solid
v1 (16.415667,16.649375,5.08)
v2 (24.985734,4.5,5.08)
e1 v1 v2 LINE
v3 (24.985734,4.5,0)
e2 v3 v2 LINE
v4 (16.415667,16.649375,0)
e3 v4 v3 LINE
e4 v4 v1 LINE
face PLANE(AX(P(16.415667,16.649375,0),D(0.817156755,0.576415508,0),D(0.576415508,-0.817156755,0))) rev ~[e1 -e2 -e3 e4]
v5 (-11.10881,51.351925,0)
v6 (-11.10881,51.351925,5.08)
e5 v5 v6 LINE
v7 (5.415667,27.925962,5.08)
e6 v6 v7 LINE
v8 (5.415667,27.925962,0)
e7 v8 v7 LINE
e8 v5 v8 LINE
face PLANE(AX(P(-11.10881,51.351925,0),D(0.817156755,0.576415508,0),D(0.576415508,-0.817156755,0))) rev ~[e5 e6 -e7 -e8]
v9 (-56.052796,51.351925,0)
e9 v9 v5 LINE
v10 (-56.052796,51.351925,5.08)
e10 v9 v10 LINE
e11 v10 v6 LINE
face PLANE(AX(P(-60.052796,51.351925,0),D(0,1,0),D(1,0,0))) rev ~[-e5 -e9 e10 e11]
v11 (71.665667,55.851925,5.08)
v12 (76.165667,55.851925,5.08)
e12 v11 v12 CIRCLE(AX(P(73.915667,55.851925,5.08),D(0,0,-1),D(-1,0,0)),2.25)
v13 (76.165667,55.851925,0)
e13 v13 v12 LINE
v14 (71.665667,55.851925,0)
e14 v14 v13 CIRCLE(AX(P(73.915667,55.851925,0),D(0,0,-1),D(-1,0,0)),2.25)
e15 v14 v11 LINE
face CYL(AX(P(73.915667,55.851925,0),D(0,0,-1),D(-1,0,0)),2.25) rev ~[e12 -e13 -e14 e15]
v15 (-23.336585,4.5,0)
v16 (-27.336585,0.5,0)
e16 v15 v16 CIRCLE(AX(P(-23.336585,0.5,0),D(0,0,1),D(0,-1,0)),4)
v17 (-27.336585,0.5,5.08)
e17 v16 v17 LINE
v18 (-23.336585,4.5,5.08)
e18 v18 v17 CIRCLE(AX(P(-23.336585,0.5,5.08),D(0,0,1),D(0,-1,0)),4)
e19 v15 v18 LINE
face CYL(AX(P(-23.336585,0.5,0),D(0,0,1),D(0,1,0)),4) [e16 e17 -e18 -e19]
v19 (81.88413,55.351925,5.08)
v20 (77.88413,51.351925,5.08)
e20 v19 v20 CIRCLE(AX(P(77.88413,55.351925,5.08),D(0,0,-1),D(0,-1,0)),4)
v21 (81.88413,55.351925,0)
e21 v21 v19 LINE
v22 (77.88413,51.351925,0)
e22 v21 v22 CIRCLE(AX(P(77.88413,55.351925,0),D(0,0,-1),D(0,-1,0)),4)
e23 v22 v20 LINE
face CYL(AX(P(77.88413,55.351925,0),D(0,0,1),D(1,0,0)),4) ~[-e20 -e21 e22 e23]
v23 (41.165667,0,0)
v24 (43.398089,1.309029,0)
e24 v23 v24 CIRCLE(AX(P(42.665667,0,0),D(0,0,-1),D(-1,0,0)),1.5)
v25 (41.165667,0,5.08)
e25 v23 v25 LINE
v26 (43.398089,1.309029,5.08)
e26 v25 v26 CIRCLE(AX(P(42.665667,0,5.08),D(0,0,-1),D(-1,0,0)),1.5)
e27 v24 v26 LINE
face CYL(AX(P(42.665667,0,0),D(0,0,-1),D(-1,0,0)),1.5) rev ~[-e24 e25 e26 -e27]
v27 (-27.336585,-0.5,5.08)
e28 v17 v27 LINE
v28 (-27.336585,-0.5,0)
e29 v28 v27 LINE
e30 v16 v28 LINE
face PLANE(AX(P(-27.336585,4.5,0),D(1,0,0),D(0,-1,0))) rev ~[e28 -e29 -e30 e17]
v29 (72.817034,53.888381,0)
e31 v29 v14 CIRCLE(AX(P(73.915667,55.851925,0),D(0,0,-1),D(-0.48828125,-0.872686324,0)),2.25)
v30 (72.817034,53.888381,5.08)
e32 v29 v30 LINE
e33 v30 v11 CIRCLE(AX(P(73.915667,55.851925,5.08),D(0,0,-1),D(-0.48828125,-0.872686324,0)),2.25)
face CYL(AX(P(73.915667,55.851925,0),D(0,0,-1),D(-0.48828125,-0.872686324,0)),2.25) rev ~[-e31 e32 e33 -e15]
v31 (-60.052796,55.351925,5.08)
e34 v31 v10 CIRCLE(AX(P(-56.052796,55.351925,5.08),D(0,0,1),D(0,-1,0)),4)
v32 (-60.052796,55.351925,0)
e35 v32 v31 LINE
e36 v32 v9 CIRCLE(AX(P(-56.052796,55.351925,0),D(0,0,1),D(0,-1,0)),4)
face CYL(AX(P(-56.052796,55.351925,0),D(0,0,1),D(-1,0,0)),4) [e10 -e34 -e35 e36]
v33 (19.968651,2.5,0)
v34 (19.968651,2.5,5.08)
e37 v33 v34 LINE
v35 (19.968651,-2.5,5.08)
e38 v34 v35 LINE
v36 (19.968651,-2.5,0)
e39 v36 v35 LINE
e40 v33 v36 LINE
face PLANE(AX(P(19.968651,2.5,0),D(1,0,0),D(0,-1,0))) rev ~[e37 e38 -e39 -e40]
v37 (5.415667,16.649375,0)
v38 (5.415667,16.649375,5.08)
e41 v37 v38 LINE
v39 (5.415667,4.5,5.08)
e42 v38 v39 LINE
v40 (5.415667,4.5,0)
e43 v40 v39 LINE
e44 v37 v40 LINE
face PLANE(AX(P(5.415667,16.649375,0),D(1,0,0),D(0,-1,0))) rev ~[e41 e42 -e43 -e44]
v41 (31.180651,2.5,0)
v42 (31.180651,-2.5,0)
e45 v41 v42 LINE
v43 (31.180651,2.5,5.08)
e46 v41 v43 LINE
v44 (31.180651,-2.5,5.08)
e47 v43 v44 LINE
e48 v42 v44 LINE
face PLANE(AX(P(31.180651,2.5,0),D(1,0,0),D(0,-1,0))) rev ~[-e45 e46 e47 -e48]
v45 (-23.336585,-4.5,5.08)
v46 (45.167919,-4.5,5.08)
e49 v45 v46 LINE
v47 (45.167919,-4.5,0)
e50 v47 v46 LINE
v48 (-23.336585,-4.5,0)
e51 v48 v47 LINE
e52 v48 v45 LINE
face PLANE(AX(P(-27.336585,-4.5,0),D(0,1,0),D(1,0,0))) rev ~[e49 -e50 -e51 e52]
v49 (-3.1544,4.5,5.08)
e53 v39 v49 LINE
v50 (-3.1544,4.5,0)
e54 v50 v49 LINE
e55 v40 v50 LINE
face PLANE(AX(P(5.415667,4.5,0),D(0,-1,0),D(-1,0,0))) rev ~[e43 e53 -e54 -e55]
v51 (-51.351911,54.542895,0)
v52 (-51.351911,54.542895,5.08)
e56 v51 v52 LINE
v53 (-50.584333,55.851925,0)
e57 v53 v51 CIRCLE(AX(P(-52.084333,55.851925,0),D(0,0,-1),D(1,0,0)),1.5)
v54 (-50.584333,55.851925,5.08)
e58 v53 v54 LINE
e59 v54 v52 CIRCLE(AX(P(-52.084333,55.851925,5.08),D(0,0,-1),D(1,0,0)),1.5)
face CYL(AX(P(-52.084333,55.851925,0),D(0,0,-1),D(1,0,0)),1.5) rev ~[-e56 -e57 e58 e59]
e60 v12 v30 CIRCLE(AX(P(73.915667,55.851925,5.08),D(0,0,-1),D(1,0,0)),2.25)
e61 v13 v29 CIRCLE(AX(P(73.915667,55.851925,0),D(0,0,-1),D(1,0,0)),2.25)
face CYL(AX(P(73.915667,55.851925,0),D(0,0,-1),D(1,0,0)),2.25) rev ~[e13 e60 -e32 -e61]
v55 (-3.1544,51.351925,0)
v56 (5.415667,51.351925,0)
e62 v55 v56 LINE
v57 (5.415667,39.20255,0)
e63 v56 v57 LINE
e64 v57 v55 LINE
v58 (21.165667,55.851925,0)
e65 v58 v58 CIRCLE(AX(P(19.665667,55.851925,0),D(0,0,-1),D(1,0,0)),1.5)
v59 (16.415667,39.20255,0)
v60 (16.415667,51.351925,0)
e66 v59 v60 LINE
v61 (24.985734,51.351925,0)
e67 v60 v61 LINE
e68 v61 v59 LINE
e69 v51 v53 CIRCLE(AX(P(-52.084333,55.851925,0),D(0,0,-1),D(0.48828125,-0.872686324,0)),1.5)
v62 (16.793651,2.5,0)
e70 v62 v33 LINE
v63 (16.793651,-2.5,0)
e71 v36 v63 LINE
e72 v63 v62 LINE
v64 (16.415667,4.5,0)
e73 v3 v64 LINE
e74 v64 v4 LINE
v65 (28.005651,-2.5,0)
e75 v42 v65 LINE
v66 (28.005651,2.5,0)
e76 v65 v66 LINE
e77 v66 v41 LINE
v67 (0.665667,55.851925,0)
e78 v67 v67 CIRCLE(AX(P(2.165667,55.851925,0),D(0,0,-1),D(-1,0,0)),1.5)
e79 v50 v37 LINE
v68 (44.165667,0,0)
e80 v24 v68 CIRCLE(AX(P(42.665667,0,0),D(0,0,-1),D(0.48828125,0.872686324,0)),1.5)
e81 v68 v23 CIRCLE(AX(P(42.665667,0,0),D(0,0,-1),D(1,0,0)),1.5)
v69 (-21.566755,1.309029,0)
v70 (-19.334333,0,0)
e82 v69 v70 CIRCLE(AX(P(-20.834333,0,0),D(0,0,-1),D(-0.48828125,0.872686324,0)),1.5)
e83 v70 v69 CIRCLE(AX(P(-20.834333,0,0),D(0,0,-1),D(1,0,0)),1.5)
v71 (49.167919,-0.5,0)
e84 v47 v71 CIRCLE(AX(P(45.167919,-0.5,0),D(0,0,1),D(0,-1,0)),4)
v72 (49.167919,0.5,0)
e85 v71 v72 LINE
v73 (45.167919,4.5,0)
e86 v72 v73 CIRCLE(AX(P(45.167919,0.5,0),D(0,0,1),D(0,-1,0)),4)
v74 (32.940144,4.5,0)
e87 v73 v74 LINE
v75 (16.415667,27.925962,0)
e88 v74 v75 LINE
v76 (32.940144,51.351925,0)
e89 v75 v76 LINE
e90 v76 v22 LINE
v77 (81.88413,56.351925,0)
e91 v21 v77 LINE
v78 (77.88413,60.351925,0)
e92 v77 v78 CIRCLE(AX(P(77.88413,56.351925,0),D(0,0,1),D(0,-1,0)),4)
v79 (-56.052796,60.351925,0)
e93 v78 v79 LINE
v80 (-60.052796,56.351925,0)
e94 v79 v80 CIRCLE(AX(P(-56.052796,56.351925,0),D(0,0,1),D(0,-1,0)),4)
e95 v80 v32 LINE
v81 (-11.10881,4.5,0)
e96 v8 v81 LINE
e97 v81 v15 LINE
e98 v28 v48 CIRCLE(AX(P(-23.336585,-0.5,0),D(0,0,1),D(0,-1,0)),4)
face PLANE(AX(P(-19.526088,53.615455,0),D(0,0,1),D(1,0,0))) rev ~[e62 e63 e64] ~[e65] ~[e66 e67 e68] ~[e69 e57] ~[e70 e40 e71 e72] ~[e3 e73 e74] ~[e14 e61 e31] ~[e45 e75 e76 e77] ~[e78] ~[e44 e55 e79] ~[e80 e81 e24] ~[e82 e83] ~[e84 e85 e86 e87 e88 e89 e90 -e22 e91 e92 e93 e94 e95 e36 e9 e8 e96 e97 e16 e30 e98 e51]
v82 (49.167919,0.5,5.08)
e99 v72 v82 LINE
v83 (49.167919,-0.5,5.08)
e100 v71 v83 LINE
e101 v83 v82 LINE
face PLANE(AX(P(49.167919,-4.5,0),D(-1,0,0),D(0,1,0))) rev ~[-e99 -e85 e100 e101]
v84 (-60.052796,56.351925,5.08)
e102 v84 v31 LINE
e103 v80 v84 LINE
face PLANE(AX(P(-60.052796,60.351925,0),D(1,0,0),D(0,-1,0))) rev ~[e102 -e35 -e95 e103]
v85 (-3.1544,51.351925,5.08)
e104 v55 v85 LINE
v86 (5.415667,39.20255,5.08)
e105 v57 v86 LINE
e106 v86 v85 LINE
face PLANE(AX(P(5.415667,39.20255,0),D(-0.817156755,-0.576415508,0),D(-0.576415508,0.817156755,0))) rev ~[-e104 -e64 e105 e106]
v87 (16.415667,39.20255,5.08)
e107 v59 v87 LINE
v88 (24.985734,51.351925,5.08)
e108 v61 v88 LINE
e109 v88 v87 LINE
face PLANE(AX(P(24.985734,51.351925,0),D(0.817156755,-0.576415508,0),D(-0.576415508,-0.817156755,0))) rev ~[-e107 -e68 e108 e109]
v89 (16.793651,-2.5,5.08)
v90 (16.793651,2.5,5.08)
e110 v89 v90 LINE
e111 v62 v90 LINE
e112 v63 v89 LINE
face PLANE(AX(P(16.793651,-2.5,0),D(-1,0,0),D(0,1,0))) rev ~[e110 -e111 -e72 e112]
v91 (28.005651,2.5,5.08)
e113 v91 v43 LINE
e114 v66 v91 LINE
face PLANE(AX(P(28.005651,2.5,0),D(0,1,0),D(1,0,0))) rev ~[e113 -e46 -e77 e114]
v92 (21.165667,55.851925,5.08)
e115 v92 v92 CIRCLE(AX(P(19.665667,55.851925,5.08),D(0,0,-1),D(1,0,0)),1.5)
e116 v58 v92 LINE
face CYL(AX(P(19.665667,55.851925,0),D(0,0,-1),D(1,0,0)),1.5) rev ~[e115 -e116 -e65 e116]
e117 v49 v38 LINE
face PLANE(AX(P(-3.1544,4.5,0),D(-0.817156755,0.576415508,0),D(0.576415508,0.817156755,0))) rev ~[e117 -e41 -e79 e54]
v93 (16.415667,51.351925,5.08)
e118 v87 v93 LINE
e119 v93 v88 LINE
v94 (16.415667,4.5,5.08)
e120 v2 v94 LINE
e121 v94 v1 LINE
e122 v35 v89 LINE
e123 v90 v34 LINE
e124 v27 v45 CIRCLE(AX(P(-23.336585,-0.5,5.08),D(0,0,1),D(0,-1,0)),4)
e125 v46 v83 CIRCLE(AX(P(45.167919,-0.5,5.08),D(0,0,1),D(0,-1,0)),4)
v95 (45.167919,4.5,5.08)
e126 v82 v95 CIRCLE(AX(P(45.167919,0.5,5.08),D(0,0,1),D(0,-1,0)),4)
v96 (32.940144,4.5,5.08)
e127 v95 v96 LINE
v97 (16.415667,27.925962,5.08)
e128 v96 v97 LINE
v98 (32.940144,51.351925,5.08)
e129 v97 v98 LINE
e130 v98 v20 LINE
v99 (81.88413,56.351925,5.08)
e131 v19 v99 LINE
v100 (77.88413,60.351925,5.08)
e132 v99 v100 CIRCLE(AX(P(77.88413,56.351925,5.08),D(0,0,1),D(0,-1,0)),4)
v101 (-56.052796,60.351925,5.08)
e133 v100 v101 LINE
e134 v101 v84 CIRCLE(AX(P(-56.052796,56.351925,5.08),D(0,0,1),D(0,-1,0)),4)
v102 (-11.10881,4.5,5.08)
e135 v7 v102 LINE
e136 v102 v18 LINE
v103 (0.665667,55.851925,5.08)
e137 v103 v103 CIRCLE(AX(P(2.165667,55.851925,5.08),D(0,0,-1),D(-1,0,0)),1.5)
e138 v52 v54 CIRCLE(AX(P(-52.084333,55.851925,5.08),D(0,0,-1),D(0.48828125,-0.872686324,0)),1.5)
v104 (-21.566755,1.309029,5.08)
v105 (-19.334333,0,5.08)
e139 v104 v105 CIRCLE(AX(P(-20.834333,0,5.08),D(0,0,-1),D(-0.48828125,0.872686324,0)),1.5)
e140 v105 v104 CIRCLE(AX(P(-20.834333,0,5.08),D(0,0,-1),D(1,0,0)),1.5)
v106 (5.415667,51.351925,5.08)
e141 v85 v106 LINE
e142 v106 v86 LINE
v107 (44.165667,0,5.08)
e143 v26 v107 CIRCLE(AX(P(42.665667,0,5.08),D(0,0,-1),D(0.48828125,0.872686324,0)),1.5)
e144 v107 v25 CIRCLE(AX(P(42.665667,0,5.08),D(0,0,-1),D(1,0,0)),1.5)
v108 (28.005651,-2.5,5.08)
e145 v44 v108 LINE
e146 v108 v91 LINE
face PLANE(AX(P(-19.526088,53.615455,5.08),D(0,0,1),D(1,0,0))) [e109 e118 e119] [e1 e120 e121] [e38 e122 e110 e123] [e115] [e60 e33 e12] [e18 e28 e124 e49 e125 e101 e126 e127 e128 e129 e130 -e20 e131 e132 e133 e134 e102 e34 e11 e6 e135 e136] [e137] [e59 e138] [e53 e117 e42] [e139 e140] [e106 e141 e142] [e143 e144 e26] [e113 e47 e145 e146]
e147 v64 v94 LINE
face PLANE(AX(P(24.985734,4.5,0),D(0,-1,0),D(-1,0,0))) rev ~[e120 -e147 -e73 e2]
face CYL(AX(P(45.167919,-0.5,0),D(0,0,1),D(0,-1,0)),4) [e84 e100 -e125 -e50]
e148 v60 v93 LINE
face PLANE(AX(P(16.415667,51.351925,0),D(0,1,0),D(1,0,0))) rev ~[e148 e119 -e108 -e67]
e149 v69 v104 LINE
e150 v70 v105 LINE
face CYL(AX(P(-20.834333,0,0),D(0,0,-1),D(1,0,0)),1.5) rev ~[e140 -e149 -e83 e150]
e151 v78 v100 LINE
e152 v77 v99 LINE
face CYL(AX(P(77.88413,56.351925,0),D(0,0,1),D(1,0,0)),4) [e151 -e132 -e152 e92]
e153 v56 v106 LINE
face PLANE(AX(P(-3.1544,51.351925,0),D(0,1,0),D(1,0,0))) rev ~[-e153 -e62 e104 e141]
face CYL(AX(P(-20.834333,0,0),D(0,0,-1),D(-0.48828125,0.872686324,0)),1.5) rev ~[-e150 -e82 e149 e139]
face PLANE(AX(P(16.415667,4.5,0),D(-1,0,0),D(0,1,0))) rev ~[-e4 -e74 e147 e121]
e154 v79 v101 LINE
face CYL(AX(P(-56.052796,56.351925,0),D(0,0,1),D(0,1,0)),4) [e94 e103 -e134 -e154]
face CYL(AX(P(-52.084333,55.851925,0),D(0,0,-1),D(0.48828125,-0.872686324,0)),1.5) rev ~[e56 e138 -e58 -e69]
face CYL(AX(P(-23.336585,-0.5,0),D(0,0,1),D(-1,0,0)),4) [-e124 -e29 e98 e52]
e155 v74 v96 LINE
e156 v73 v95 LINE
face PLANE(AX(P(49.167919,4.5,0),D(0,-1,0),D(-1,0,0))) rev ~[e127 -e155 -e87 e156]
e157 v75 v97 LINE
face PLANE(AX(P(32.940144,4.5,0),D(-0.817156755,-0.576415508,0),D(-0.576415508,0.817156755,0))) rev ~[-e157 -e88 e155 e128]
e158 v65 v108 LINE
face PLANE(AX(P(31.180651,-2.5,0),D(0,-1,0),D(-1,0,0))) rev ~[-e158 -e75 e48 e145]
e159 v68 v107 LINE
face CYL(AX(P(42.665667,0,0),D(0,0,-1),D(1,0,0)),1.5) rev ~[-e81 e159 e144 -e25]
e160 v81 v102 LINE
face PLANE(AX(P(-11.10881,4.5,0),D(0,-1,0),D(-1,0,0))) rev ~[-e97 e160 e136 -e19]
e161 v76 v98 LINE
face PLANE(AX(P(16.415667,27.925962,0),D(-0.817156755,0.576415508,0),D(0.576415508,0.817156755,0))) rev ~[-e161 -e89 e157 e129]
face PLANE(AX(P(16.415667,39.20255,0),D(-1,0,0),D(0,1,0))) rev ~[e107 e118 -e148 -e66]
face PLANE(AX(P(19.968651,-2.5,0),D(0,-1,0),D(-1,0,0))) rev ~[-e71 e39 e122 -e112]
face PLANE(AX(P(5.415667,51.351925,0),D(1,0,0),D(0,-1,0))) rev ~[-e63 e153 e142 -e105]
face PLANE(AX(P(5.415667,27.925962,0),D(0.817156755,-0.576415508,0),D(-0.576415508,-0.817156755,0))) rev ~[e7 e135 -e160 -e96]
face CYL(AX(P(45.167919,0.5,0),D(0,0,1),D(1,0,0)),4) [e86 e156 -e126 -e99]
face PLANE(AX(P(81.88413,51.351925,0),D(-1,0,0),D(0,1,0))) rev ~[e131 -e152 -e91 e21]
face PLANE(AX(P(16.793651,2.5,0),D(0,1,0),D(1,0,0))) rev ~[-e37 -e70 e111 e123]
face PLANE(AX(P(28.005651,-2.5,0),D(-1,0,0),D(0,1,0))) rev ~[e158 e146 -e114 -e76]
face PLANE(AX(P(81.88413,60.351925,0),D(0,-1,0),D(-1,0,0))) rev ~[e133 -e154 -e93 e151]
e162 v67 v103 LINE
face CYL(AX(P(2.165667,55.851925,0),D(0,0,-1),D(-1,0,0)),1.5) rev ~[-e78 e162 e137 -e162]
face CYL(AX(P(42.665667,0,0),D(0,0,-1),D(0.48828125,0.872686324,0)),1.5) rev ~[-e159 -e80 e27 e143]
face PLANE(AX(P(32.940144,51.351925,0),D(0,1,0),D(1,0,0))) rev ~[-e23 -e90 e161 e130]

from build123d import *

# Parameters (mm, degrees)
F1_DEPTH = 5.08
F2_R     = 4


# Not quite as in the source:
# - a feature names something its author has since deleted; it is built from what else it names


with BuildPart() as f1:
    # F0 (on Top) → F1 (new body)
    with BuildSketch(Plane.XY):
        with BuildLine():
            Line((0.6656670719, 55.8519247654), (-50.5843329281, 55.8519247654))
            ThreePointArc((-50.5843329281, 55.8519247654), (-50.7903791398, 55.0931866065), (-51.3519110531, 54.5428952787))
            Line((-51.3519110531, 54.5428952787), (-49.566514597, 51.3519247654))
            Line((-49.566514597, 51.3519247654), (-11.1088099211, 51.3519247654))
            Line((-11.1088099211, 51.3519247654), (-3.1543997556, 51.3519247654))
            Line((-3.1543997556, 51.3519247654), (5.4156670719, 51.3519247654))
            Line((5.4156670719, 51.3519247654), (10.9156670719, 51.3519247654))
            Line((10.9156670719, 51.3519247654), (10.9156670719, 55.8519247654))
            Line((10.9156670719, 55.8519247654), (3.6656670719, 55.8519247654))
            ThreePointArc((3.6656670719, 55.8519247654), (2.1656670719, 54.3519247654), (0.6656670719, 55.8519247654))
        make_face()
        with BuildLine():
            Line((-11.1088099211, 4.5), (-23.3521512592, 4.5))
            Line((-23.3521512592, 4.5), (-21.5667548031, 1.3090294867))
            ThreePointArc((-21.5667548031, 1.3090294867), (-20.0755947692, 1.2939537883), (-19.3343329281, 0))
            Line((-19.3343329281, 0), (10.9156670719, 0))
            Line((10.9156670719, 0), (10.9156670719, 4.5))
            Line((10.9156670719, 4.5), (5.4156670719, 4.5))
            Line((5.4156670719, 4.5), (-3.1543997556, 4.5))
            Line((-3.1543997556, 4.5), (-11.1088099211, 4.5))
        make_face()
        with BuildLine():
            ThreePointArc((-51.3519110531, 54.5428952787), (-53.3782867164, 56.6106629243), (-50.5843329281, 55.8519247654))
            Line((-50.5843329281, 55.8519247654), (0.6656670719, 55.8519247654))
            ThreePointArc((0.6656670719, 55.8519247654), (2.1656670719, 57.3519247654), (3.6656670719, 55.8519247654))
            Line((3.6656670719, 55.8519247654), (10.9156670719, 55.8519247654))
            Line((10.9156670719, 55.8519247654), (18.1656670719, 55.8519247654))
            ThreePointArc((18.1656670719, 55.8519247654), (19.6656670719, 57.3519247654), (21.1656670719, 55.8519247654))
            Line((21.1656670719, 55.8519247654), (71.6656670719, 55.8519247654))
            ThreePointArc((71.6656670719, 55.8519247654), (73.9156670719, 58.1019247654), (76.1656670719, 55.8519247654))
            ThreePointArc((76.1656670719, 55.8519247654), (75.0537743102, 53.910994083), (72.8170342594, 53.8883805354))
            Line((72.8170342594, 53.8883805354), (71.3978487408, 51.3519247654))
            Line((71.3978487408, 51.3519247654), (81.8841302488, 51.3519247654))
            Line((81.8841302488, 51.3519247654), (81.8841302488, 60.3519247654))
            Line((81.8841302488, 60.3519247654), (-60.052796105, 60.3519247654))
            Line((-60.052796105, 60.3519247654), (-60.052796105, 51.3519247654))
            Line((-60.052796105, 51.3519247654), (-49.566514597, 51.3519247654))
            Line((-49.566514597, 51.3519247654), (-51.3519110531, 54.5428952787))
        make_face()
        with BuildLine():
            Line((-21.5667548031, 1.3090294867), (-23.3521512592, 4.5))
            Line((-23.3521512592, 4.5), (-27.3365851734, 4.5))
            Line((-27.3365851734, 4.5), (-27.3365851734, -4.5))
            Line((-27.3365851734, -4.5), (49.1679193172, -4.5))
            Line((49.1679193172, -4.5), (49.1679193172, 4.5))
            Line((49.1679193172, 4.5), (45.183485403, 4.5))
            Line((45.183485403, 4.5), (43.3980889469, 1.3090294867))
            ThreePointArc((43.3980889469, 1.3090294867), (43.9596208602, 0.7587381589), (44.1656670719, 0))
            ThreePointArc((44.1656670719, 0), (42.6656670719, -1.5), (41.1656670719, 0))
            Line((41.1656670719, 0), (31.1806510627, 0))
            Line((31.1806510627, 0), (31.1806510627, -2.5))
            Line((31.1806510627, -2.5), (28.0056510627, -2.5))
            Line((28.0056510627, -2.5), (28.0056510627, 0))
            Line((28.0056510627, 0), (19.9686510627, 0))
            Line((19.9686510627, 0), (19.9686510627, -2.5))
            Line((19.9686510627, -2.5), (16.7936510627, -2.5))
            Line((16.7936510627, -2.5), (16.7936510627, 0))
            Line((16.7936510627, 0), (10.9156670719, 0))
            Line((10.9156670719, 0), (-19.3343329281, 0))
            ThreePointArc((-19.3343329281, 0), (-21.593071087, -1.2939537883), (-21.5667548031, 1.3090294867))
        make_face()
        with BuildLine():
            Line((10.9156670719, 4.5), (10.9156670719, 0))
            Line((10.9156670719, 0), (16.7936510627, 0))
            Line((16.7936510627, 0), (16.7936510627, 2.5))
            Line((16.7936510627, 2.5), (19.9686510627, 2.5))
            Line((19.9686510627, 2.5), (19.9686510627, 0))
            Line((19.9686510627, 0), (28.0056510627, 0))
            Line((28.0056510627, 0), (28.0056510627, 2.5))
            Line((28.0056510627, 2.5), (31.1806510627, 2.5))
            Line((31.1806510627, 2.5), (31.1806510627, 0))
            Line((31.1806510627, 0), (41.1656670719, 0))
            ThreePointArc((41.1656670719, 0), (41.906928913, 1.2939537883), (43.3980889469, 1.3090294867))
            Line((43.3980889469, 1.3090294867), (45.183485403, 4.5))
            Line((45.183485403, 4.5), (32.9401440649, 4.5))
            Line((32.9401440649, 4.5), (24.9857338994, 4.5))
            Line((24.9857338994, 4.5), (16.4156670719, 4.5))
            Line((16.4156670719, 4.5), (10.9156670719, 4.5))
        make_face()
        with BuildLine():
            Line((18.1656670719, 55.8519247654), (10.9156670719, 55.8519247654))
            Line((10.9156670719, 55.8519247654), (10.9156670719, 51.3519247654))
            Line((10.9156670719, 51.3519247654), (16.4156670719, 51.3519247654))
            Line((16.4156670719, 51.3519247654), (24.9857338994, 51.3519247654))
            Line((24.9857338994, 51.3519247654), (32.9401440649, 51.3519247654))
            Line((32.9401440649, 51.3519247654), (71.3978487408, 51.3519247654))
            Line((71.3978487408, 51.3519247654), (72.8170342594, 53.8883805354))
            ThreePointArc((72.8170342594, 53.8883805354), (71.9747363894, 54.7138175271), (71.6656670719, 55.8519247654))
            Line((71.6656670719, 55.8519247654), (21.1656670719, 55.8519247654))
            ThreePointArc((21.1656670719, 55.8519247654), (19.6656670719, 54.3519247654), (18.1656670719, 55.8519247654))
        make_face()
        Polygon((5.4156670719, 39.2025500407), (5.4156670719, 27.9259623827), (10.9156670719, 27.9259623827), (10.9156670719, 51.3519247654), (5.4156670719, 51.3519247654), align=None)
        Polygon((10.9156670719, 27.9259623827), (5.4156670719, 27.9259623827), (5.4156670719, 16.6493747247), (5.4156670719, 4.5), (10.9156670719, 4.5), align=None)
        Polygon((16.4156670719, 51.3519247654), (10.9156670719, 51.3519247654), (10.9156670719, 27.9259623827), (16.4156670719, 27.9259623827), (16.4156670719, 39.2025500407), align=None)
        Polygon((16.4156670719, 27.9259623827), (10.9156670719, 27.9259623827), (10.9156670719, 4.5), (16.4156670719, 4.5), (16.4156670719, 16.6493747247), align=None)
        Polygon((-3.1543997556, 51.3519247654), (-11.1088099211, 51.3519247654), (5.4156670719, 27.9259623827), (5.4156670719, 39.2025500407), align=None)
        Polygon((5.4156670719, 27.9259623827), (-11.1088099211, 4.5), (-3.1543997556, 4.5), (5.4156670719, 16.6493747247), align=None)
        Polygon((32.9401440649, 4.5), (16.4156670719, 27.9259623827), (16.4156670719, 16.6493747247), (24.9857338994, 4.5), align=None)
        Polygon((16.4156670719, 39.2025500407), (16.4156670719, 27.9259623827), (32.9401440649, 51.3519247654), (24.9857338994, 51.3519247654), align=None)
    extrude(amount=F1_DEPTH)

    # F2
    f2_edges = [f1.edges().sort_by_distance(p)[0] for p in [
        (-60.052796, 60.351925, 2.54),
        (-60.052796, 51.351925, 2.54),
        (81.88413, 60.351925, 2.54),
        (81.88413, 51.351925, 2.54),
        (49.167919, 4.5, 2.54),
        (49.167919, -4.5, 2.54),
        (-27.336585, 4.5, 2.54),
        (-27.336585, -4.5, 2.54),
    ]]
    fillet(f2_edges, radius=F2_R)


solid = f1.part
